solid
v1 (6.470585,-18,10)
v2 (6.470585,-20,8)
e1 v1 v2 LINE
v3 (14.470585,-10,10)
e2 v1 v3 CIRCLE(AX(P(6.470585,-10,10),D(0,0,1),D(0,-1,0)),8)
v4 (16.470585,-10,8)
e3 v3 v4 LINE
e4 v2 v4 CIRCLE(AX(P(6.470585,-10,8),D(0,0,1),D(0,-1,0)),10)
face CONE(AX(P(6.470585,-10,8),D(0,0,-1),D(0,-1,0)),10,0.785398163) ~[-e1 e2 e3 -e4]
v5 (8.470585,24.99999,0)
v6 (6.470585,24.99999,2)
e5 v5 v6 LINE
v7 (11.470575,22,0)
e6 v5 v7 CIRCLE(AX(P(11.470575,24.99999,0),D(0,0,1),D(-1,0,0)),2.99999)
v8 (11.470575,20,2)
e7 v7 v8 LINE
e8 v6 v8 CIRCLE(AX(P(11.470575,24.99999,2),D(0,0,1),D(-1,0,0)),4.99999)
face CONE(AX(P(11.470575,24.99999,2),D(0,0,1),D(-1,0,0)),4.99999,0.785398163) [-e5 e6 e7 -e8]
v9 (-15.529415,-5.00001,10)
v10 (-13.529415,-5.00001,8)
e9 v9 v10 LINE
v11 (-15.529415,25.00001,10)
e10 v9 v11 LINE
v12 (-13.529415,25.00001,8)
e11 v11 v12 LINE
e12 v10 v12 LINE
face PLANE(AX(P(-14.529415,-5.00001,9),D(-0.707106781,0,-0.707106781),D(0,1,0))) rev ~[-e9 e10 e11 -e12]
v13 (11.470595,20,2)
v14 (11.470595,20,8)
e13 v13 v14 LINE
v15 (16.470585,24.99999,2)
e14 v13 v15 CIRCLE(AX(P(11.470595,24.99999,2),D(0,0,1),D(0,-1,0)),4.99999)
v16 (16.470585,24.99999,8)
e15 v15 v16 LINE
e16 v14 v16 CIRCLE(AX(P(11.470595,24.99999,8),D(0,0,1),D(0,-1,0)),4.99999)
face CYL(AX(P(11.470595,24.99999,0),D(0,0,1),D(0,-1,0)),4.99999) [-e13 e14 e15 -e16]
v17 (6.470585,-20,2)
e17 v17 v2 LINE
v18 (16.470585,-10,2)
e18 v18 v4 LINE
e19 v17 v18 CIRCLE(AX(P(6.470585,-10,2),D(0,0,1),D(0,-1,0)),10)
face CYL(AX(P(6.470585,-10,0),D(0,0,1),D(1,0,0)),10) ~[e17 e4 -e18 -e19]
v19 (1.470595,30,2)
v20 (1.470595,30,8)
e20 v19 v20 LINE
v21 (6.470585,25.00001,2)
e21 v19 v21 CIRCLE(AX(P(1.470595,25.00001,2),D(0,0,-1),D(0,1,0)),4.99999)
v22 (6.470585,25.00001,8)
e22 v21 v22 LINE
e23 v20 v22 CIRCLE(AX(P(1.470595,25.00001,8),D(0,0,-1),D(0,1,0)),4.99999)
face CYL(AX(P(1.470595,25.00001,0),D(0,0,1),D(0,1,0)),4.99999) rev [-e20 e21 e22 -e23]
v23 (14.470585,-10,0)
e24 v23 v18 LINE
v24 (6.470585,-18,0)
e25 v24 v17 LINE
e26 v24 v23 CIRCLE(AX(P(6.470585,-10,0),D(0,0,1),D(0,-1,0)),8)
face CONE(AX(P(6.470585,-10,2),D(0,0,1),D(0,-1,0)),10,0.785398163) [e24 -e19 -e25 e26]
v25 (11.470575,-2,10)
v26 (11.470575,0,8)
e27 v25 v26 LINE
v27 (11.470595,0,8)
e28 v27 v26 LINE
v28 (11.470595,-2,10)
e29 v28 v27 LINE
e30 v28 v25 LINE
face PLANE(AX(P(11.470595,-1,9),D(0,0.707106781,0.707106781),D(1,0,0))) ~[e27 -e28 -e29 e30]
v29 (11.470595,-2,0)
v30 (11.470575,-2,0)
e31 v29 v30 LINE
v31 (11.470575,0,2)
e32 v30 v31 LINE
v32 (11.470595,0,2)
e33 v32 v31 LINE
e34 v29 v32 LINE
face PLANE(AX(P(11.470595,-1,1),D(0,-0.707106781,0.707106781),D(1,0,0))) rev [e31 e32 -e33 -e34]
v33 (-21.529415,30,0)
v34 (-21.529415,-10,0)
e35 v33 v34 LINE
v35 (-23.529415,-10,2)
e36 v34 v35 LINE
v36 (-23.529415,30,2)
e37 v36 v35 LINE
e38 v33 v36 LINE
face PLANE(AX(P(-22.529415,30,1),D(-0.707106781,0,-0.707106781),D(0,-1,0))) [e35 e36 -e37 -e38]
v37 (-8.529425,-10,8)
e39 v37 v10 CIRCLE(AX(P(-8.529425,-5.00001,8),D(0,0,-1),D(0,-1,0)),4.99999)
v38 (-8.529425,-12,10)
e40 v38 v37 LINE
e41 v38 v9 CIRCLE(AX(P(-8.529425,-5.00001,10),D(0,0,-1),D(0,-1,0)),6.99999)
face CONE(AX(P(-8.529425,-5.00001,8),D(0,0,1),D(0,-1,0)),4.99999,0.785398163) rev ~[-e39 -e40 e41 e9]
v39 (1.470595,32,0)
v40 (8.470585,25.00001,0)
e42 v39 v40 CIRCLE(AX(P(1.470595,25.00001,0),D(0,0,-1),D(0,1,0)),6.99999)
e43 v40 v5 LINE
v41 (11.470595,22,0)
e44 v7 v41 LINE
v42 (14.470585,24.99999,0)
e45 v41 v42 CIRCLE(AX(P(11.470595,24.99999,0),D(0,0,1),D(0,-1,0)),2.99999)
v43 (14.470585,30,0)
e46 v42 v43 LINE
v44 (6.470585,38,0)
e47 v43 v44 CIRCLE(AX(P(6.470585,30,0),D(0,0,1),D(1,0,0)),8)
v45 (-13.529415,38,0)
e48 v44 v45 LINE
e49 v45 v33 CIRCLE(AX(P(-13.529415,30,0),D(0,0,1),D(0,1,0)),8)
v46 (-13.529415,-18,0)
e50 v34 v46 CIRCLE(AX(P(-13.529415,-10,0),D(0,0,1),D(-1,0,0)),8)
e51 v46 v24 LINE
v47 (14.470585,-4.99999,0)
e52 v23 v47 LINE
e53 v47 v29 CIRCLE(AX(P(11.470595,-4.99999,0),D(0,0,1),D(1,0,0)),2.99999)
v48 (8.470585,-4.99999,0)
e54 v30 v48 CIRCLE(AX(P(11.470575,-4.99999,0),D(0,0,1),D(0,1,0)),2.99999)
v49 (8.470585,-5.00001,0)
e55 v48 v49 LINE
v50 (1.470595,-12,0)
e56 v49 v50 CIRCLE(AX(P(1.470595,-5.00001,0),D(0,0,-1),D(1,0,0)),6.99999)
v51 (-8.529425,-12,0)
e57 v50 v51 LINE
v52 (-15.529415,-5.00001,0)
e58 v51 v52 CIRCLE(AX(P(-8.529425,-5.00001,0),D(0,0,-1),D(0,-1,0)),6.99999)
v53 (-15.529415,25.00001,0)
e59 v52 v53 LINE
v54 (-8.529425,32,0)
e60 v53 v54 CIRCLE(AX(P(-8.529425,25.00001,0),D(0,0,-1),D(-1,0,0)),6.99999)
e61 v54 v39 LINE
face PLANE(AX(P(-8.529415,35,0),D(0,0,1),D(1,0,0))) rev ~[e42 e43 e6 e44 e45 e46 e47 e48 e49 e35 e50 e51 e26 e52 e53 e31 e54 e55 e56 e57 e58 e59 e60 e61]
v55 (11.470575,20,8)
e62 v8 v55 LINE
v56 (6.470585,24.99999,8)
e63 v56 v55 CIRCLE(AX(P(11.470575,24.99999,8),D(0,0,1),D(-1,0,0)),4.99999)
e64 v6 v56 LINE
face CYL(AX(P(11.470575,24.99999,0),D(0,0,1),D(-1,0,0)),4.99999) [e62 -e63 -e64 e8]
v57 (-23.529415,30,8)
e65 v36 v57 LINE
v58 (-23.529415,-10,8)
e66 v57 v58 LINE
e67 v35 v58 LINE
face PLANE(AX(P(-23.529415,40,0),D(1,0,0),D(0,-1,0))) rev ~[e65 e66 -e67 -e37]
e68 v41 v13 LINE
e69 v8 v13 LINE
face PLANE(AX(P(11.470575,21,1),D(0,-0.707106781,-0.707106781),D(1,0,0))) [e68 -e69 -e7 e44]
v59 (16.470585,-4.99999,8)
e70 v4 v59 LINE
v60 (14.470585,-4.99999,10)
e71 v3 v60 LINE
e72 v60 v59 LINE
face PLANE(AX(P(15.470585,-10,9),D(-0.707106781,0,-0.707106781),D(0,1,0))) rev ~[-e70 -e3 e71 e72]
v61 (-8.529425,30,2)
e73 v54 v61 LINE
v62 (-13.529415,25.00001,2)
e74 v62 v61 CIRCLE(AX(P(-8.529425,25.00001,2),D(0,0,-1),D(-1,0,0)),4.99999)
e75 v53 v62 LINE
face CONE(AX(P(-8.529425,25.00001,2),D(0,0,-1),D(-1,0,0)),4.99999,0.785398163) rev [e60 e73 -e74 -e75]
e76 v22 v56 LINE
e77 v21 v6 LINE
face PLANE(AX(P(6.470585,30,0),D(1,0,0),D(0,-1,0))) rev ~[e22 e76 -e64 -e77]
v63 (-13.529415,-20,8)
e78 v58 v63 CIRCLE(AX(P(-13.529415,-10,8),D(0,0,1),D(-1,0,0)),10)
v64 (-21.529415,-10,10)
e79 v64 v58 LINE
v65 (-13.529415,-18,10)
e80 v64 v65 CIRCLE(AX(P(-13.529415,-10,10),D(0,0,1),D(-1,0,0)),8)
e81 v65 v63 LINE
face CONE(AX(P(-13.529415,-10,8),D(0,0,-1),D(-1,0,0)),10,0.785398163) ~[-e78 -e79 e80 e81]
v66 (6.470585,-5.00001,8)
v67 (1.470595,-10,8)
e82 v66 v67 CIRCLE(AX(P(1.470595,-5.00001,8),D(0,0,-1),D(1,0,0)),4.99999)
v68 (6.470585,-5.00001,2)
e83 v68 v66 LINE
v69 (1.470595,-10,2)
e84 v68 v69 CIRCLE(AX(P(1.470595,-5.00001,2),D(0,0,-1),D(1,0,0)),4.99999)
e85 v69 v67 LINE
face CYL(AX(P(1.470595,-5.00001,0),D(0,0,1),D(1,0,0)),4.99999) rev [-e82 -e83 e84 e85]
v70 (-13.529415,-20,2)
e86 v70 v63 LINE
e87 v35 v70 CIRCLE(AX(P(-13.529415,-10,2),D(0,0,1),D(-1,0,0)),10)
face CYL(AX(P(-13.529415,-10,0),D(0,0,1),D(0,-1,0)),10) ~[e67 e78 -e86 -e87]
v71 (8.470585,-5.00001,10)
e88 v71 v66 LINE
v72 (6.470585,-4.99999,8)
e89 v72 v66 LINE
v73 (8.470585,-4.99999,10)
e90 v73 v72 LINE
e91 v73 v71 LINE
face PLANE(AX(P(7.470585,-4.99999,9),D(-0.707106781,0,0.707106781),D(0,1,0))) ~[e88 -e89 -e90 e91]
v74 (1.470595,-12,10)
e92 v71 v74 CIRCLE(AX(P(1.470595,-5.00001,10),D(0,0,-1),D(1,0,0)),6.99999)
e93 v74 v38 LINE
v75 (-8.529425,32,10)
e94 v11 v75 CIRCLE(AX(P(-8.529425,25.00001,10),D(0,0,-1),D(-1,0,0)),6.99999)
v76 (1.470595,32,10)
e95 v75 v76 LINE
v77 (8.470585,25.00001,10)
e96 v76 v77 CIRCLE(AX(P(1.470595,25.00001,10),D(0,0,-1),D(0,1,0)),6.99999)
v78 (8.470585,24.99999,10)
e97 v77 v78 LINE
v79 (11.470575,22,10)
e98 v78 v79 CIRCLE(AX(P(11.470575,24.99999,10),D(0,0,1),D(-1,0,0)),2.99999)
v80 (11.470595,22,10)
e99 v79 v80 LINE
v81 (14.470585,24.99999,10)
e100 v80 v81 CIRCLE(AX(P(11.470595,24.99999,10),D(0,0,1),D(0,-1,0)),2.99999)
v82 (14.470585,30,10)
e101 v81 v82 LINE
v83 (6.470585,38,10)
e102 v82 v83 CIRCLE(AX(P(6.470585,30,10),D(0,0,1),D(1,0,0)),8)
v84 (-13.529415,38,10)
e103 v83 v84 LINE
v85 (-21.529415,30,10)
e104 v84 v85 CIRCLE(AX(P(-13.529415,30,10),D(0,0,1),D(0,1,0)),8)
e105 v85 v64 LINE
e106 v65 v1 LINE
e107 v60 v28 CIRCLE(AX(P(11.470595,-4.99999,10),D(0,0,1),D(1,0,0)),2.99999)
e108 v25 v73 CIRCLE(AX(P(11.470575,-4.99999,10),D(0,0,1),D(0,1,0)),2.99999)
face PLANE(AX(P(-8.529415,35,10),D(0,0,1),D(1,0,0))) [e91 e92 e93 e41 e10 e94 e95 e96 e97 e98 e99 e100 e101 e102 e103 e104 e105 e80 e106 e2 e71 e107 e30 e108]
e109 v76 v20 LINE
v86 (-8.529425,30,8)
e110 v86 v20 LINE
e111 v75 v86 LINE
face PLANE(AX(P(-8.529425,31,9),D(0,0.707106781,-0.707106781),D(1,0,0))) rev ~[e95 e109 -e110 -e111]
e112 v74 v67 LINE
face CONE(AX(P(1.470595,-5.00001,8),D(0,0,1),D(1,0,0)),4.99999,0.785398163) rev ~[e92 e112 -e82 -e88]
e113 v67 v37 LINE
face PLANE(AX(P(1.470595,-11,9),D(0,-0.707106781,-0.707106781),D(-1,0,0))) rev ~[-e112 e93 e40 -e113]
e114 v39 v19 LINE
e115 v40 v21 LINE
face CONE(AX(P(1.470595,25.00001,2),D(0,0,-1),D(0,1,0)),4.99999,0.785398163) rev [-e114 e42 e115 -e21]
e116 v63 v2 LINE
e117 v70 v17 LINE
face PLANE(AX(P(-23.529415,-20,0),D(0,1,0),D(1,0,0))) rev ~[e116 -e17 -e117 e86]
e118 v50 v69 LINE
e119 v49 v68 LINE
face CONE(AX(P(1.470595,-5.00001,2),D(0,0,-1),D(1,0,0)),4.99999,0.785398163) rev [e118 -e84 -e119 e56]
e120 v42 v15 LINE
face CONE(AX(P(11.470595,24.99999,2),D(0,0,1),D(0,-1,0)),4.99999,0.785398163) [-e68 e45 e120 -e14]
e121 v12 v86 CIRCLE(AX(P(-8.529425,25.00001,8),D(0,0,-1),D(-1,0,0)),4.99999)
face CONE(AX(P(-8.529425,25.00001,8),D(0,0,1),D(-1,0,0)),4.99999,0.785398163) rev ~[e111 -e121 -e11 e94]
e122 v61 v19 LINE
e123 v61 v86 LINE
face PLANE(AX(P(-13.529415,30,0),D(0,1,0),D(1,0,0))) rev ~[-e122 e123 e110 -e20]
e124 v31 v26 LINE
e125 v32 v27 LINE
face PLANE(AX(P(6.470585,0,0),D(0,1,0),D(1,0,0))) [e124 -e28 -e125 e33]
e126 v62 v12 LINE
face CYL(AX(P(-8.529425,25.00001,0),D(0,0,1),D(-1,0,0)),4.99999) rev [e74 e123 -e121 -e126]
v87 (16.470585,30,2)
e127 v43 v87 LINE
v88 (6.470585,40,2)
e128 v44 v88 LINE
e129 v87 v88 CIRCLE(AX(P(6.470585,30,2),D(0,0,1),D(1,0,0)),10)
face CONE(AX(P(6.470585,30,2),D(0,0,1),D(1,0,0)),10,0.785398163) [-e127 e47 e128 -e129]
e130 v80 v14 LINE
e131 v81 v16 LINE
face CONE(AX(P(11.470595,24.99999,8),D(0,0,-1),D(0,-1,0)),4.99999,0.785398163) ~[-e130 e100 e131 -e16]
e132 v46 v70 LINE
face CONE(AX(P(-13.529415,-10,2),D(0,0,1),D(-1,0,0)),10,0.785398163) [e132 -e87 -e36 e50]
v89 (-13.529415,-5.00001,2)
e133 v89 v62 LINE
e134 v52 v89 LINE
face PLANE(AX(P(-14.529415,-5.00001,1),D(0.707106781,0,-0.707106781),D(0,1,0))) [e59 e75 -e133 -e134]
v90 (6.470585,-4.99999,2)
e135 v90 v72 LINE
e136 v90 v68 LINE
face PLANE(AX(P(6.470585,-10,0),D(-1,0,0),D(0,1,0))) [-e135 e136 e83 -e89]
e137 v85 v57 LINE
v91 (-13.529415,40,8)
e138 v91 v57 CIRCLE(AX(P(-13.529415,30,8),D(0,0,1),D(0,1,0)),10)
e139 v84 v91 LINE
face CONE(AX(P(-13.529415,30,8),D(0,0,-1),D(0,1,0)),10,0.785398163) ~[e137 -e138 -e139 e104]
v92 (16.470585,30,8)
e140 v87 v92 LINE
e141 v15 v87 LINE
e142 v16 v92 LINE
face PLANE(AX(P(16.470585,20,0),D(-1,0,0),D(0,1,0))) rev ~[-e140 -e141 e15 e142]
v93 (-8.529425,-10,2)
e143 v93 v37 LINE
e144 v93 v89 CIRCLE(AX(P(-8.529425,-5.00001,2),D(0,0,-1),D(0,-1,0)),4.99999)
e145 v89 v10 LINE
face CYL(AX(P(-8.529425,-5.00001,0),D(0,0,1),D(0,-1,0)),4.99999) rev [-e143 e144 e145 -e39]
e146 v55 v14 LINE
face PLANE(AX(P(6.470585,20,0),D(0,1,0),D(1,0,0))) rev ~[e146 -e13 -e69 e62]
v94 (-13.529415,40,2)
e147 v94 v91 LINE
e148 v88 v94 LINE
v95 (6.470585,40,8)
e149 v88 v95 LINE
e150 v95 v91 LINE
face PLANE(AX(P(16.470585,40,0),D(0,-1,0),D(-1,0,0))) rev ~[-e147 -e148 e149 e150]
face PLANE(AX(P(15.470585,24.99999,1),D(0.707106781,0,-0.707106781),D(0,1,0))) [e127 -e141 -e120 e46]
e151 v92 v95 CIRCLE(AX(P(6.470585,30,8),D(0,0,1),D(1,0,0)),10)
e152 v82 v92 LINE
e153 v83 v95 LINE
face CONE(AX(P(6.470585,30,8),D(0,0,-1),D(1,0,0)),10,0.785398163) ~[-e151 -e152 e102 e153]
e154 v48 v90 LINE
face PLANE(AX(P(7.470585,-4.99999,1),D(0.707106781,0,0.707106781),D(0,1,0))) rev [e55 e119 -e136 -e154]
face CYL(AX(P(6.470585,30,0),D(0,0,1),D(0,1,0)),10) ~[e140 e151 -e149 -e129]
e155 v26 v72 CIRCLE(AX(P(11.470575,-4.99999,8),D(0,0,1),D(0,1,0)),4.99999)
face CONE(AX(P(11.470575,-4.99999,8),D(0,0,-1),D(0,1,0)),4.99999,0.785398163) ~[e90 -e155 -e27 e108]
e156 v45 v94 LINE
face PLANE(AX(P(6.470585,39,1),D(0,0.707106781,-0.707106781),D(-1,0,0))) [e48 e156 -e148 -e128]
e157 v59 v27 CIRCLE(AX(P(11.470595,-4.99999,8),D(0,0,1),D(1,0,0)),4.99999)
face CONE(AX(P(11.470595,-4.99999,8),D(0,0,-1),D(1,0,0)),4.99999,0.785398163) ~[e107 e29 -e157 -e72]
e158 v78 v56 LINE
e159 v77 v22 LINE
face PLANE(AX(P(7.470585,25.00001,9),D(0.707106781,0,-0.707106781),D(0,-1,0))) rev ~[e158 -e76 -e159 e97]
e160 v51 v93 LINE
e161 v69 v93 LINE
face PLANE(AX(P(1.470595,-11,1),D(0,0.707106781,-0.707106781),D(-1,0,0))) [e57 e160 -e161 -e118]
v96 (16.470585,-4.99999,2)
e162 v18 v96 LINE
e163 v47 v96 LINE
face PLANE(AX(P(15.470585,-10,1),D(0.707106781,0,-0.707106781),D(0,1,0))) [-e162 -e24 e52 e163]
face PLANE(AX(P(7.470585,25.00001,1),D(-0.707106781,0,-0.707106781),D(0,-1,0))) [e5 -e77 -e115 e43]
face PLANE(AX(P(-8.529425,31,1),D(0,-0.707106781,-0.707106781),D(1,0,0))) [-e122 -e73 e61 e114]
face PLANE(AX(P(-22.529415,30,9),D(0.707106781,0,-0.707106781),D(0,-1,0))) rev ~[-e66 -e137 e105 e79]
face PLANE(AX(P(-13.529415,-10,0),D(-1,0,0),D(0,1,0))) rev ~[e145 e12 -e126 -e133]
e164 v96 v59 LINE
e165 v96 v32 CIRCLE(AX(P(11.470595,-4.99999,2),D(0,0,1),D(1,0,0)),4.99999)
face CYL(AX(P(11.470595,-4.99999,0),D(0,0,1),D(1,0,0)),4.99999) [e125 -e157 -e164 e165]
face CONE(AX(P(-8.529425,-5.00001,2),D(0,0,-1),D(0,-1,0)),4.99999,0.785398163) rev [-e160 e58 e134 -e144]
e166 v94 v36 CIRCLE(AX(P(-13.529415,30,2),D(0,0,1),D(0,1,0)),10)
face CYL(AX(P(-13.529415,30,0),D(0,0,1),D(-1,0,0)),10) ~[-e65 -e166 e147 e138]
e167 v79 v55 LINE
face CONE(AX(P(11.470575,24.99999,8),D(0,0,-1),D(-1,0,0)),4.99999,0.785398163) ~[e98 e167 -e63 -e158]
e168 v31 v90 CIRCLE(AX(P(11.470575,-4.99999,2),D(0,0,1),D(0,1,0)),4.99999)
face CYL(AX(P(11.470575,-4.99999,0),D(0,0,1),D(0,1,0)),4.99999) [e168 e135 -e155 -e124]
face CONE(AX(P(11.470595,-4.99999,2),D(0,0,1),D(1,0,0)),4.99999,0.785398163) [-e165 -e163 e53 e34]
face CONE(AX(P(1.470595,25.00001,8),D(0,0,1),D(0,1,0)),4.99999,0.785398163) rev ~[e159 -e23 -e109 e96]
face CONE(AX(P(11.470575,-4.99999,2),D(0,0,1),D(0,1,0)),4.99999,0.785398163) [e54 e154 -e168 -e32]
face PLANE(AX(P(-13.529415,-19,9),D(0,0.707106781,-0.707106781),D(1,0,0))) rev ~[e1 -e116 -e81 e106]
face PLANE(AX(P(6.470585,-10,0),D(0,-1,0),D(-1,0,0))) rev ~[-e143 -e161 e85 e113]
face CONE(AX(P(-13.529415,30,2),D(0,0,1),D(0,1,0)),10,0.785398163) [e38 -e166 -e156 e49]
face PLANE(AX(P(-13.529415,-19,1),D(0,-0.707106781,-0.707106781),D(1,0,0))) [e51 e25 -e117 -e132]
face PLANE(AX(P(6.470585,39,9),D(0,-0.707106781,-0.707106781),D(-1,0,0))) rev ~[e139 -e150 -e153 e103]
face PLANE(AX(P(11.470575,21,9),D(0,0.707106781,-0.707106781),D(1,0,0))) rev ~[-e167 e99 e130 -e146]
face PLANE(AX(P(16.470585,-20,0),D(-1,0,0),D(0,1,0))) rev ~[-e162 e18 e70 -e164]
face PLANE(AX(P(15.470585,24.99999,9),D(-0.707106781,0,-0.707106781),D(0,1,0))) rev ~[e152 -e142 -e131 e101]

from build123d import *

# Parameters (mm, degrees)
F0_W     = 10
F0_H     = 10
F1_DEPTH = 10
F2_R     = 4.99999
F3_R     = 10
F4_SIZE  = 2


# Not quite as in the source:
# - a fillet or chamfer is up to 0.001 mm smaller than in the source, because OpenCascade refuses the exact size


with BuildPart() as f1:
    # F0 (on Top) → F1 (new body)
    with BuildSketch(Plane.XY):
        Polygon((6.4705845391, 30), (6.4705845391, 40), (-23.5294154609, 40), (-23.5294154609, 30), (-13.5294154609, 30), align=None)
        Polygon((16.4705845391, 40), (6.4705845391, 40), (6.4705845391, 30), (6.4705845391, 20), (16.4705845391, 20), align=None)
        Polygon((-13.5294154609, -10), (-13.5294154609, 30), (-23.5294154609, 30), (-23.5294154609, -20), (-13.5294154609, -20), align=None)
        Polygon((6.4705845391, -10), (-13.5294154609, -10), (-13.5294154609, -20), (16.4705845391, -20), (16.4705845391, -10), align=None)
        with Locations((11.4705845391, -5)):
            Rectangle(F0_W, F0_H)
    extrude(amount=F1_DEPTH)

    # F2 (radius 5 in the source; OpenCascade refuses exactly that, so slightly less here)
    f2_edges = [f1.edges().sort_by_distance(p)[0] for p in [
        (16.470585, 0, 5),
        (6.470585, 0, 5),
        (-13.529415, -10, 5),
        (6.470585, -10, 5),
        (6.470585, 20, 5),
        (6.470585, 30, 5),
        (-13.529415, 30, 5),
        (16.470585, 20, 5),
    ]]
    fillet(f2_edges, radius=F2_R)

    # F3
    f3_edges = [f1.edges().sort_by_distance(p)[0] for p in [
        (16.470585, 40, 5),
        (-23.529415, 40, 5),
        (16.470585, -20, 5),
        (-23.529415, -20, 5),
    ]]
    fillet(f3_edges, radius=F3_R)

    # F4
    f4_edges = [f1.edges().sort_by_distance(p)[0] for p in [
        (16.470585, 27.499995, 10),
        (13.541652, 37.071068, 10),
        (15.006121, 21.464463, 10),
        (-3.529415, 40, 10),
        (11.470585, 20, 10),
        (-20.600483, 37.071068, 10),
        (7.935048, 21.464463, 10),
        (-23.529415, 10, 10),
        (6.470585, 25, 10),
        (-20.600483, -17.071068, 10),
        (5.006121, 28.535537, 10),
        (-3.529415, -20, 10),
        (-3.529415, 30, 10),
        (13.541652, -17.071068, 10),
        (-12.064952, 28.535537, 10),
        (16.470585, -7.499995, 10),
        (-13.529415, 10, 10),
        (15.006121, -1.464463, 10),
        (-12.064952, -8.535537, 10),
        (11.470585, 0, 10),
        (-3.529415, -10, 10),
        (7.935048, -1.464463, 10),
        (5.006121, -8.535537, 10),
        (6.470585, -5, 10),
        (16.470585, 27.499995, 0),
        (13.541652, 37.071068, 0),
        (15.006121, 21.464463, 0),
        (-3.529415, 40, 0),
        (11.470585, 20, 0),
        (-20.600483, 37.071068, 0),
        (7.935048, 21.464463, 0),
        (-23.529415, 10, 0),
        (6.470585, 25, 0),
        (-20.600483, -17.071068, 0),
        (5.006121, 28.535537, 0),
        (-3.529415, -20, 0),
        (-3.529415, 30, 0),
        (13.541652, -17.071068, 0),
        (-12.064952, 28.535537, 0),
        (16.470585, -7.499995, 0),
        (-13.529415, 10, 0),
        (15.006121, -1.464463, 0),
        (-12.064952, -8.535537, 0),
        (11.470585, 0, 0),
        (-3.529415, -10, 0),
        (7.935048, -1.464463, 0),
        (5.006121, -8.535537, 0),
        (6.470585, -5, 0),
    ]]
    chamfer(f4_edges, length=F4_SIZE)


solid = f1.part
